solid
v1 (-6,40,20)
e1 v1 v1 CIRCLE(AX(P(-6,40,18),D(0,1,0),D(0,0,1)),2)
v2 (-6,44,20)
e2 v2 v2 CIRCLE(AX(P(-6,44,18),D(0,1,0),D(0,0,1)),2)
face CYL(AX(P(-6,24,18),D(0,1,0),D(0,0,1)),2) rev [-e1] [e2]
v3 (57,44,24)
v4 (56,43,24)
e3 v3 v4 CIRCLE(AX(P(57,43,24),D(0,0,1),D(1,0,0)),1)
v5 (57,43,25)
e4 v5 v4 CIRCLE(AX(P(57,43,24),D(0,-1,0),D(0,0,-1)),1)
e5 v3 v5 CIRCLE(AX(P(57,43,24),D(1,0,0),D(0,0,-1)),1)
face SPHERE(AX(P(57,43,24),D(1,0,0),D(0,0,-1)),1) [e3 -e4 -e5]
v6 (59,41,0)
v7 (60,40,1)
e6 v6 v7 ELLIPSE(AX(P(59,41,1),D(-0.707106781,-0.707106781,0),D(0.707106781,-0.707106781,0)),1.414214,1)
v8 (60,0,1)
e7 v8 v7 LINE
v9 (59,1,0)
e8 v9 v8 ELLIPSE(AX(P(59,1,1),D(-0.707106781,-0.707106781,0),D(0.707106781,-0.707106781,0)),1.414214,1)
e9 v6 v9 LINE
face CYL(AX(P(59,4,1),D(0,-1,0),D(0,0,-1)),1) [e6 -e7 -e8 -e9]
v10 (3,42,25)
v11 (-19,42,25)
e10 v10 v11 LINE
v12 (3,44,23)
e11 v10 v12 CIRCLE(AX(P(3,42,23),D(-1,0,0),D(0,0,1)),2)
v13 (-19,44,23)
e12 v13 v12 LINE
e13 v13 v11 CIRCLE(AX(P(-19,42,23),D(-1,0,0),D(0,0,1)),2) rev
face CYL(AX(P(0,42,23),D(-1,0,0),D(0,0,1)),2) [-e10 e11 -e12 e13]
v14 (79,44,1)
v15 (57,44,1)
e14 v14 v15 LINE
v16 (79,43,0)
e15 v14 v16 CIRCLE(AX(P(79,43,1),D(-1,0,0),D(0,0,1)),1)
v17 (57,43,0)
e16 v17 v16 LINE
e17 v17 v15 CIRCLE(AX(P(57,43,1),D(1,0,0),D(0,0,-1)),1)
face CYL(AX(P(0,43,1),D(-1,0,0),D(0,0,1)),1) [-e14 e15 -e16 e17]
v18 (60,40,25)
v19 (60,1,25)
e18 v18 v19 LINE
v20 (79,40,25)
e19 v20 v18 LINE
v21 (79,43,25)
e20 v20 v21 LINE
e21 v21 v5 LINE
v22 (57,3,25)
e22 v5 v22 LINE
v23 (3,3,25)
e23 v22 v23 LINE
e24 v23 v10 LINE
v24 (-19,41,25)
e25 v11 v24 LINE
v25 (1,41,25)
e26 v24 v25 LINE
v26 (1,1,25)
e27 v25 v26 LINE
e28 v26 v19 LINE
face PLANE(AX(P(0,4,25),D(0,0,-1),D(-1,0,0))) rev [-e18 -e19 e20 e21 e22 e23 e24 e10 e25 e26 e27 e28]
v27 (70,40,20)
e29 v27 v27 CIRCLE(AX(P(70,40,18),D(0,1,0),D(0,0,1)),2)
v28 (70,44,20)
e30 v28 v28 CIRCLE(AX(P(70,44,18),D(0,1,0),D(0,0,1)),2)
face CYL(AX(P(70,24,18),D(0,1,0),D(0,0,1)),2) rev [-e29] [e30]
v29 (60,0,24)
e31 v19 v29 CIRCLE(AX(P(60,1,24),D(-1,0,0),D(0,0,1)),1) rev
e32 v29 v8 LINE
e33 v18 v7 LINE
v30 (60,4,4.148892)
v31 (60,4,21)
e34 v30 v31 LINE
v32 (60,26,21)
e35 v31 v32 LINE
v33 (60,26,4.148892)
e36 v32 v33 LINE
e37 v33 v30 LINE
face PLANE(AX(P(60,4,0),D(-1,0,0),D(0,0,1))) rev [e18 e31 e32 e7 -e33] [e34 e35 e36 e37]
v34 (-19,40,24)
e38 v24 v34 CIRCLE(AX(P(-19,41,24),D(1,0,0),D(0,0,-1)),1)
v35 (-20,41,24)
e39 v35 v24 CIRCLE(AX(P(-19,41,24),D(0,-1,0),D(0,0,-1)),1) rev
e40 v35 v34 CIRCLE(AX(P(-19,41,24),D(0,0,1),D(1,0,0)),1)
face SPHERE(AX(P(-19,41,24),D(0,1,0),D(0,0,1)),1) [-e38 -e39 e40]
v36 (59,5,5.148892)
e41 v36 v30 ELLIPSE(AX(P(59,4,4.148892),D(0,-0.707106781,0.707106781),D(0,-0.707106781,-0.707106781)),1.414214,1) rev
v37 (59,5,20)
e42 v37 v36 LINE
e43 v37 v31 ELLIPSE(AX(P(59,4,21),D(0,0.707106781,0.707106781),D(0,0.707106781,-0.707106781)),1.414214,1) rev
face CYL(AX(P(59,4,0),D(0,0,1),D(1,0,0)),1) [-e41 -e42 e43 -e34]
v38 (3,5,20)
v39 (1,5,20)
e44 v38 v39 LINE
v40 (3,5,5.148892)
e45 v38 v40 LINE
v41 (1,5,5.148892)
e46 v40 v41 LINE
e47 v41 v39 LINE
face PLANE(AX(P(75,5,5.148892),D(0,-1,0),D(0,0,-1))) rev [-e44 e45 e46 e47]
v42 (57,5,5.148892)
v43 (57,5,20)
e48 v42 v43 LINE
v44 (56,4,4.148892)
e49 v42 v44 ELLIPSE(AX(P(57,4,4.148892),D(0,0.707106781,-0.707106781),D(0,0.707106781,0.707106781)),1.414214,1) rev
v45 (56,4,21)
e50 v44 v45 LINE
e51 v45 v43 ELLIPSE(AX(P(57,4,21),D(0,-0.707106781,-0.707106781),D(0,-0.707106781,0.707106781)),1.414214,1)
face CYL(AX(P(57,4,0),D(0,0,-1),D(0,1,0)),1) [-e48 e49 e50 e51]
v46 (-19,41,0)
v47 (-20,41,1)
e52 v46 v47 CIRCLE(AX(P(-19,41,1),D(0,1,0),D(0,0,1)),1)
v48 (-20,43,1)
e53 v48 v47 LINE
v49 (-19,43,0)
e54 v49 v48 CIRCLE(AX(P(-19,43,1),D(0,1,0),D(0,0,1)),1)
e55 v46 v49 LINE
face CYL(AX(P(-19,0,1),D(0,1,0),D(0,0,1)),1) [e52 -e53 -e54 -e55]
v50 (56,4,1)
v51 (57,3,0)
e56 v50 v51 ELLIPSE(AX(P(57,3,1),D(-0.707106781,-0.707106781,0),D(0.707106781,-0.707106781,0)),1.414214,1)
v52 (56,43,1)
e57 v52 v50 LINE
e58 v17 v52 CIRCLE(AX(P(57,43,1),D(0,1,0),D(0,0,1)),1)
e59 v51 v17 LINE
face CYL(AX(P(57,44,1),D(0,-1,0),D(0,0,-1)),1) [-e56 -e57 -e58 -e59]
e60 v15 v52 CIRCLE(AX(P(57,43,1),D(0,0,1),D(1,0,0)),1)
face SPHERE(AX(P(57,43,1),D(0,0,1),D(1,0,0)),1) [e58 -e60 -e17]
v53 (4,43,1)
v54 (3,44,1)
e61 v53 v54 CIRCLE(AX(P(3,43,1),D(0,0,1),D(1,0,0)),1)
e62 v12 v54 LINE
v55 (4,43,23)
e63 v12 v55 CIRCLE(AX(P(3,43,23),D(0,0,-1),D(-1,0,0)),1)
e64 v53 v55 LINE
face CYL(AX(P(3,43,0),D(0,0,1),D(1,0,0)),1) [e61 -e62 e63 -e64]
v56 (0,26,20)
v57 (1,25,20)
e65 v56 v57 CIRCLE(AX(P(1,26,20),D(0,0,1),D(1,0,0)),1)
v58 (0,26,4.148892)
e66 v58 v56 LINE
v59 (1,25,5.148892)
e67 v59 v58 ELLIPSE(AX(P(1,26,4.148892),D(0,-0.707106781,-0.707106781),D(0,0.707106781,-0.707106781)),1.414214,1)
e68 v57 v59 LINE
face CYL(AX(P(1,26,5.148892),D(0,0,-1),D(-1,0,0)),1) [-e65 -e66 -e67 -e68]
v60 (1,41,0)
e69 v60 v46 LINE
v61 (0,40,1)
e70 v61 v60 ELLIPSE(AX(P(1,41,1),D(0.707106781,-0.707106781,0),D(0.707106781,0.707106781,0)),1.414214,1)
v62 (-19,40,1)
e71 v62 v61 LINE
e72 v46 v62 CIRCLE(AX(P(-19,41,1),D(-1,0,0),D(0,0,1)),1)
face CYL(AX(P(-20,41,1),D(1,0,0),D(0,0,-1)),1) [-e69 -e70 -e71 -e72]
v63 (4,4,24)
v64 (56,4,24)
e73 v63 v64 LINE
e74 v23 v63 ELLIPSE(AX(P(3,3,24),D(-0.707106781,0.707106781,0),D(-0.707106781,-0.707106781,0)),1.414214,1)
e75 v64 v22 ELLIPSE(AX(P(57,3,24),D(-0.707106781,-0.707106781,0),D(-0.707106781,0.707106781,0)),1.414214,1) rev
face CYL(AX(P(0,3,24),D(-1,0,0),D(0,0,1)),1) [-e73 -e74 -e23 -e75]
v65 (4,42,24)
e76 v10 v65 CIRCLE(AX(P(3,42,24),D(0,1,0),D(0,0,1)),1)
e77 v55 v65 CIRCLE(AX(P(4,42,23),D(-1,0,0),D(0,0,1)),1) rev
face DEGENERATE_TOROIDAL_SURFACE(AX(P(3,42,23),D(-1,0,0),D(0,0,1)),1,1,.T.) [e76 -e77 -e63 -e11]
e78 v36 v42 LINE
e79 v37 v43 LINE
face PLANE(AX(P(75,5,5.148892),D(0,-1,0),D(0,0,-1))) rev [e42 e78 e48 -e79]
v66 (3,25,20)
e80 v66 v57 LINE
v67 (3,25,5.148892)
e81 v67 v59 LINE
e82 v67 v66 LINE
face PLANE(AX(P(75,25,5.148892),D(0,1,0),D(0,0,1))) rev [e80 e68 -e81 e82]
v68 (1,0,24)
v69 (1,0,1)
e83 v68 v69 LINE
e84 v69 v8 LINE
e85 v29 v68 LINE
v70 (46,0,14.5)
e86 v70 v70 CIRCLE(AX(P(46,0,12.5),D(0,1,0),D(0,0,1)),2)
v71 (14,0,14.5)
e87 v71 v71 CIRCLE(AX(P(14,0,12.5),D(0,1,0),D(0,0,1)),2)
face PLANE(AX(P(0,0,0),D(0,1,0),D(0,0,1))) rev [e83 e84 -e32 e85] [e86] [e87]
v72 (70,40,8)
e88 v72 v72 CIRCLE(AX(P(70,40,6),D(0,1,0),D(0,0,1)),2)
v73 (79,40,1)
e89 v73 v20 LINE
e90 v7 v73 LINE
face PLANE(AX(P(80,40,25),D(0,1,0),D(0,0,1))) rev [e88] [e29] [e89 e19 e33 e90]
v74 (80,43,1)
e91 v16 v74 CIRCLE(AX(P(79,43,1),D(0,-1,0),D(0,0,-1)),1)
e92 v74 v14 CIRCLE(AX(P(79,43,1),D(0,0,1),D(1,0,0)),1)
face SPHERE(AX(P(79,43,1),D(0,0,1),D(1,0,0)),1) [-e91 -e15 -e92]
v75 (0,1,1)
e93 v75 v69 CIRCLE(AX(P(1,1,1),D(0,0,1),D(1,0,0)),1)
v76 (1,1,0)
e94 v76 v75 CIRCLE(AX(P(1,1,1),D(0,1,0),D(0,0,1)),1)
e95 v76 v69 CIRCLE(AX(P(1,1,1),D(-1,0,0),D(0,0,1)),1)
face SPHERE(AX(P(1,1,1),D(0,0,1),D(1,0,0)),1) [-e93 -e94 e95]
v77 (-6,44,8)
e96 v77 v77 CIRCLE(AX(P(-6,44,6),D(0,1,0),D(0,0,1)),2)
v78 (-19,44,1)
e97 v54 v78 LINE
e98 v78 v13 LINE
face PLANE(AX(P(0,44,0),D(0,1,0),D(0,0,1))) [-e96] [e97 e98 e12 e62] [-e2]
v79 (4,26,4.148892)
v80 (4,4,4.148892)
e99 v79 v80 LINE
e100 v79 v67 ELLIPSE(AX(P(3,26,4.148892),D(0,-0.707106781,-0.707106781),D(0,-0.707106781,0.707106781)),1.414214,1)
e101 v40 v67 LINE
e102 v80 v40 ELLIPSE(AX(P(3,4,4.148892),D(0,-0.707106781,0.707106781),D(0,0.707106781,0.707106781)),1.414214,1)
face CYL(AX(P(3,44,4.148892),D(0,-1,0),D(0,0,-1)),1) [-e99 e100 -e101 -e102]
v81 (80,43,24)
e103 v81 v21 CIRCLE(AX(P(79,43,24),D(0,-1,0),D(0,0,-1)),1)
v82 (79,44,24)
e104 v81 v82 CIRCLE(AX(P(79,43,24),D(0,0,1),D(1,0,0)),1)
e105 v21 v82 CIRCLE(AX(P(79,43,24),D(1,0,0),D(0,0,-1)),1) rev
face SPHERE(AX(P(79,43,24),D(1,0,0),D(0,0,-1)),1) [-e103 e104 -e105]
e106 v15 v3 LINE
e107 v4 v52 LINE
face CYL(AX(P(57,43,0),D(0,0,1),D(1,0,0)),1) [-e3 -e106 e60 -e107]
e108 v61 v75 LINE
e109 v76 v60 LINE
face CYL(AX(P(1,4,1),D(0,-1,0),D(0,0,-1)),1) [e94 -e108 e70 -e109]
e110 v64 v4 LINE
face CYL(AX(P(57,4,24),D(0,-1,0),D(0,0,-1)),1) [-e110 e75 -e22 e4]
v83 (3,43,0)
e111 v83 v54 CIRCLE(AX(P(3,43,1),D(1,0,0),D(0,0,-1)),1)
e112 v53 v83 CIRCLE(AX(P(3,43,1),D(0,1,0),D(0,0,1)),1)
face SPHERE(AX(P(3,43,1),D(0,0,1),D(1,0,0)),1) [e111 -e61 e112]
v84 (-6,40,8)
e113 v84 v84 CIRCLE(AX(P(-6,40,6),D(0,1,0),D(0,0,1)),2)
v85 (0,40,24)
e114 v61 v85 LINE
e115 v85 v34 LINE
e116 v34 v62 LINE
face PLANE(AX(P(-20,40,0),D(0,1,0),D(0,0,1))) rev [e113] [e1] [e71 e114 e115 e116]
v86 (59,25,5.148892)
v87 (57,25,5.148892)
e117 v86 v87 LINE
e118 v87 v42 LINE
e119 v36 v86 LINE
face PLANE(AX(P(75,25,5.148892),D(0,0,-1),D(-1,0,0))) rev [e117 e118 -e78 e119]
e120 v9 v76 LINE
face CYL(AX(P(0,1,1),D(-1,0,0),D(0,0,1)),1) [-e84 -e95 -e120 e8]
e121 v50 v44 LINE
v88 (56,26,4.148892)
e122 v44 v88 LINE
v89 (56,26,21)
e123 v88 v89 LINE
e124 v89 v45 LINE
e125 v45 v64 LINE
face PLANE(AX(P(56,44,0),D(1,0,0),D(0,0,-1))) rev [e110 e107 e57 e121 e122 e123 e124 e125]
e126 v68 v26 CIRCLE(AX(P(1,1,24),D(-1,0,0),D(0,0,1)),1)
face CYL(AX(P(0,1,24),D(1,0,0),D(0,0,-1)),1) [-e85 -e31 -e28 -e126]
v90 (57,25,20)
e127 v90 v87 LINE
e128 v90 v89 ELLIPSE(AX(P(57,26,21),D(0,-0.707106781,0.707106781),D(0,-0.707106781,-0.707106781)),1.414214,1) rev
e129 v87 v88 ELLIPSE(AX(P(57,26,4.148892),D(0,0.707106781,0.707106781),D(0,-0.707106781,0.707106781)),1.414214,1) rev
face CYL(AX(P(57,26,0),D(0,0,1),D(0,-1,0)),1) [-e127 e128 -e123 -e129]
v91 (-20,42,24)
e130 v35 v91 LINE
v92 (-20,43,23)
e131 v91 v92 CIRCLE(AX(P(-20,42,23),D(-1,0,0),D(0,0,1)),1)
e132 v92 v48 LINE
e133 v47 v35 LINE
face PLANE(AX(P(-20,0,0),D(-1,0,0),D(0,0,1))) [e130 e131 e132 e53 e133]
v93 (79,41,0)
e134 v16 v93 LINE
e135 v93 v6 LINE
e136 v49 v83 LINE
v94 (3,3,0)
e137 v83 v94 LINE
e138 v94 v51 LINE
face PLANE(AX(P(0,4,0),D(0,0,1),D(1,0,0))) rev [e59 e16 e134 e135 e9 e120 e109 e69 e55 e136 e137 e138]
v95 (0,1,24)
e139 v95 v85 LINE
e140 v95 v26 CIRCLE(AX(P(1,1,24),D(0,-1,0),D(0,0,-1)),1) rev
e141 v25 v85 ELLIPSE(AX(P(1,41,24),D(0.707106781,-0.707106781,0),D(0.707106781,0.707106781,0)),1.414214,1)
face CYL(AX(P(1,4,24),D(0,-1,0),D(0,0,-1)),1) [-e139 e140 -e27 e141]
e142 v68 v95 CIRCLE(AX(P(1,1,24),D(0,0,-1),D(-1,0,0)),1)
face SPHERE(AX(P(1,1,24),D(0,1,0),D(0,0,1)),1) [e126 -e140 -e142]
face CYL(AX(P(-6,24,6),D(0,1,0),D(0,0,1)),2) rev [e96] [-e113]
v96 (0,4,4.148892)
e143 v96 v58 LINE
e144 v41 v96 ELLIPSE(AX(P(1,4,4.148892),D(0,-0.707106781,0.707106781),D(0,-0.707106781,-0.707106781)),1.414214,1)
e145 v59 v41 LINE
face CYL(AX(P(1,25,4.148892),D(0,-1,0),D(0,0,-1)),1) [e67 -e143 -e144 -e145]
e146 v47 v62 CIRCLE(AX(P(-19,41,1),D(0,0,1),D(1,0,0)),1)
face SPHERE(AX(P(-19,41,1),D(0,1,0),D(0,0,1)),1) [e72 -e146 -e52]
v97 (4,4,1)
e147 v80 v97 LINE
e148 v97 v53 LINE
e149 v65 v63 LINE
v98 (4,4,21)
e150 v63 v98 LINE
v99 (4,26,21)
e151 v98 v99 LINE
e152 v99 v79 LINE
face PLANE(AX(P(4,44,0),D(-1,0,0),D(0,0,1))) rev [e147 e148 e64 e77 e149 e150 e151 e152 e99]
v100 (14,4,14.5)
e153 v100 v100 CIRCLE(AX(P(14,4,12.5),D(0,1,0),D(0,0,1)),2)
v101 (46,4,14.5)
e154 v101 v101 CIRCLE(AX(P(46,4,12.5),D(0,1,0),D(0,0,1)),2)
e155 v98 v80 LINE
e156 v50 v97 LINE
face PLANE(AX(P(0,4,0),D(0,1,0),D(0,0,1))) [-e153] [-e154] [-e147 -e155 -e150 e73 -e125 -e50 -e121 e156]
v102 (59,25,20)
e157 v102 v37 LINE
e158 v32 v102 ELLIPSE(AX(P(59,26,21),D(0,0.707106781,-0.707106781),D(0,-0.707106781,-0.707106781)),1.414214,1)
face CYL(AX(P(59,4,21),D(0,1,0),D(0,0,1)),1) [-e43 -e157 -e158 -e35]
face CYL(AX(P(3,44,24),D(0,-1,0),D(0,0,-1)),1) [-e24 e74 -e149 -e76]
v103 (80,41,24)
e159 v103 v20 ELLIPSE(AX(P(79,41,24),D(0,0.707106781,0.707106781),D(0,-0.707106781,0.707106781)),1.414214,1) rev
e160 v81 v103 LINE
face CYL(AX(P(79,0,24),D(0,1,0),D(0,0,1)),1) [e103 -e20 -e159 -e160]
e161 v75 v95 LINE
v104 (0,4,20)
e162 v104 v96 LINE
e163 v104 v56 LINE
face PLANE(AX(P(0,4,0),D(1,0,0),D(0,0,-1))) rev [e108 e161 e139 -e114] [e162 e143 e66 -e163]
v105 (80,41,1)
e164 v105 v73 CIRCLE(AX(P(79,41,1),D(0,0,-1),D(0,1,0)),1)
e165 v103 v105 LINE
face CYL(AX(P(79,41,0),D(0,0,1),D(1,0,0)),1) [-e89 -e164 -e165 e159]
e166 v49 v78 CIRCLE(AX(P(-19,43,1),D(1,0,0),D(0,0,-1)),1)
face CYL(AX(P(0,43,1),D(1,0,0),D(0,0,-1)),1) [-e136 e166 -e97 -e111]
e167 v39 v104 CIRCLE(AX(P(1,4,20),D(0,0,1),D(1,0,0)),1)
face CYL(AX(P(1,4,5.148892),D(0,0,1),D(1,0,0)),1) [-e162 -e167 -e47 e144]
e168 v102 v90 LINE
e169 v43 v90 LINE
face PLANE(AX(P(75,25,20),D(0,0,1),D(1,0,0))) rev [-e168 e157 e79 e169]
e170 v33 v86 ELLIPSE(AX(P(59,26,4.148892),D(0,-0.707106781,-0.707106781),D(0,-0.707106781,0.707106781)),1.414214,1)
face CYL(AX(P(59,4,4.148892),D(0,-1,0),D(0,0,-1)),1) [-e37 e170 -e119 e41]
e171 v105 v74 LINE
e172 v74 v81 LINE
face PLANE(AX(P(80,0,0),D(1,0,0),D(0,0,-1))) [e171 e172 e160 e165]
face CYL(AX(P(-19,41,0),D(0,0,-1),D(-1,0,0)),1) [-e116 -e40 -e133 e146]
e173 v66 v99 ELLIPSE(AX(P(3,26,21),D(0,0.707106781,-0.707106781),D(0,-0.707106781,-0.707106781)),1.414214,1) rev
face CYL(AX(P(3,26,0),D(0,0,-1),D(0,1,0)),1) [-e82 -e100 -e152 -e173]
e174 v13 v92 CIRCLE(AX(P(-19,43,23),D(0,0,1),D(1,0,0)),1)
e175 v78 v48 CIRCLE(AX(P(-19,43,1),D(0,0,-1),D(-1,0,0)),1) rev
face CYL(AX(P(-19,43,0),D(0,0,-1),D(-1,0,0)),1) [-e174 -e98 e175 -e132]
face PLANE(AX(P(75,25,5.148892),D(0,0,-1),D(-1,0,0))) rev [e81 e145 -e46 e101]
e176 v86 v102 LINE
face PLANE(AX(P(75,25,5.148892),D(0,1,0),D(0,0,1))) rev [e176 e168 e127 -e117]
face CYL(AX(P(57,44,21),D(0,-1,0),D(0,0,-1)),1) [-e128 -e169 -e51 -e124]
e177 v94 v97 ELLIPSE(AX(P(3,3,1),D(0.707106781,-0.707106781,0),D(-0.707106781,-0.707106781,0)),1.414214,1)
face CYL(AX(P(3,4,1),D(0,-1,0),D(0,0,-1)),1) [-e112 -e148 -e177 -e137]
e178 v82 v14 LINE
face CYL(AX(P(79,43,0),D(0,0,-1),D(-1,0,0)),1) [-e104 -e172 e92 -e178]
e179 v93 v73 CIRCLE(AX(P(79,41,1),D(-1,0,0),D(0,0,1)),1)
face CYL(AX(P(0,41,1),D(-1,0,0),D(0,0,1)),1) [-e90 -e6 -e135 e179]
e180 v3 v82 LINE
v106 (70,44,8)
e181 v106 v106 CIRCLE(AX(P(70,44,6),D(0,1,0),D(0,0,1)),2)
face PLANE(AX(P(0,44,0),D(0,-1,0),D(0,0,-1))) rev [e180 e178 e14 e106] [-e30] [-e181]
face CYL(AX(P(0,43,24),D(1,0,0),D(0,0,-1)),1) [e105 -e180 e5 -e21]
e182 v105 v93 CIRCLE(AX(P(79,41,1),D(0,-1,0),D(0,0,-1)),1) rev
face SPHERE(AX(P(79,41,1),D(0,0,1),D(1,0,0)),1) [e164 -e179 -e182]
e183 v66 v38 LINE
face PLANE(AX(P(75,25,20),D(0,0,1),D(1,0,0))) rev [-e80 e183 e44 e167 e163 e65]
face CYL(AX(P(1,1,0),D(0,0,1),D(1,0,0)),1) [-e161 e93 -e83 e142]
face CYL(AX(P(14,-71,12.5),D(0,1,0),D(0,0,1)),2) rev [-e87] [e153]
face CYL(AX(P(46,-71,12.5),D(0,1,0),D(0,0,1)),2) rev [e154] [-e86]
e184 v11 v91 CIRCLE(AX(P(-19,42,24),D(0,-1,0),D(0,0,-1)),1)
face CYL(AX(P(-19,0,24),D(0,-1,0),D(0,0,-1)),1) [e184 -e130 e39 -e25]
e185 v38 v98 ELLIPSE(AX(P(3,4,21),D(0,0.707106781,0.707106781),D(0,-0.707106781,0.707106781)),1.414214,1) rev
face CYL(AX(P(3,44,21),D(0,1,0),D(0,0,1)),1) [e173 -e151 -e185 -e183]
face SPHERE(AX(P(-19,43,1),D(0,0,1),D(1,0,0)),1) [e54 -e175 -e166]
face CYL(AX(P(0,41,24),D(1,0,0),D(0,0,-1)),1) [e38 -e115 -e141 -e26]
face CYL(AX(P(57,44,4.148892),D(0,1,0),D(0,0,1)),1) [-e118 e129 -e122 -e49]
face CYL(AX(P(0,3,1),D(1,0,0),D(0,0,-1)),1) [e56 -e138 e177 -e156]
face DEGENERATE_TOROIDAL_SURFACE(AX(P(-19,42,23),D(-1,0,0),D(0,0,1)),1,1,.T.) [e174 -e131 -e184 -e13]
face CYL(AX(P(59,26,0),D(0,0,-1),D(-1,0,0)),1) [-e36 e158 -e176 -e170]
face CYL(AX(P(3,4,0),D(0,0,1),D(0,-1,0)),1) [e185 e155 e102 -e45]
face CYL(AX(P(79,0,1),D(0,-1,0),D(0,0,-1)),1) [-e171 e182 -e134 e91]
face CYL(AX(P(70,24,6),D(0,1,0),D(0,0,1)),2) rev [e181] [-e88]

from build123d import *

# Parameters (mm, degrees)
BOSS_EXTRUDE1_DEPTH = 4
BOSS_EXTRUDE2_DEPTH = 40
SKETCH3_W           = 25
SKETCH3_H           = 4.000000000000007
BOSS_EXTRUDE3_DEPTH = 20
BOSS_EXTRUDE4_DEPTH = 20
SKETCH5_R           = 2.0000000000000004
SKETCH5_R_2         = 2.0000000000000018
SKETCH5_R_3         = 1.9999999999999967
CUT_EXTRUDE1_DEPTH  = 20
CUT_EXTRUDE3_DEPTH  = 75.00000000000004
SKETCH11_R          = 2.0000000000000027
CUT_EXTRUDE4_DEPTH  = 75.00000000000004
FILLET1_R           = 2
FILLET2_R           = 1
FILLET3_R           = 1
FILLET4_R           = 1
FILLET5_R           = 1
FILLET6_R           = 1
FILLET7_R           = 1
FILLET8_R           = 1
FILLET9_R           = 1
FILLET10_R          = 1
FILLET11_R          = 1
FILLET12_R          = 1
FILLET13_R          = 1
FILLET14_R          = 1
FILLET15_R          = 1
FILLET16_R          = 1
FILLET17_R          = 1
FILLET18_R          = 1
FILLET19_R          = 1
FILLET20_R          = 1
FILLET21_R          = 1


# Some blends are built 0.0001 mm under size
with BuildPart() as part:
    # Sketch1 → Boss-Extrude1 (new body)
    with BuildSketch(Plane(origin=(0, 0, 0), x_dir=(1, 0, 0), z_dir=(0, 1, 0))):
        Polygon((0, 0), (60, 0), (60.00000000000001, -25), (6.94e-15, -25), align=None)
    extrude(amount=BOSS_EXTRUDE1_DEPTH)

    # Sketch2 → Boss-Extrude2 (add)
    with BuildSketch(Plane(origin=(0, 4, 0), x_dir=(1, 0, 0), z_dir=(0, 1, 0))):
        Polygon((0, 0), (4, 0), (4.0000000000000036, -25), (0, -25), align=None)
        Polygon((60, 0), (55.99999999999999, -4.9e-16), (55.99999999999999, -25), (60, -25), align=None)
    extrude(amount=BOSS_EXTRUDE2_DEPTH)

    # Sketch3 → Boss-Extrude3 (add)
    with BuildSketch(Plane(origin=(60, 0, -1.665e-14), x_dir=(-2.8e-16, 0, -1), z_dir=(1, 0, -2.8e-16))):
        with Locations((-12.500000000000018, 42)):
            Rectangle(SKETCH3_W, SKETCH3_H)
    extrude(amount=BOSS_EXTRUDE3_DEPTH)

    # Sketch4 → Boss-Extrude4 (add)
    with BuildSketch(Plane.ZY):
        Polygon((0, 44), (25, 44), (25, 39.99999999999999), (4.9e-16, 39.99999999999999), align=None)
    extrude(amount=BOSS_EXTRUDE4_DEPTH)

    # Sketch5 → Cut-Extrude1 (cut)
    with BuildSketch(Plane(origin=(0, 44, 0), x_dir=(1, 0, 0), z_dir=(0, 1, 0))):
        with Locations(Location((-5.999999999999995, -6.000000000000008, 0), (0, 0, 270))):
            Circle(SKETCH5_R)
        with Locations(Location((-5.9999999999999964, -18.00000000000001, 0), (0, 0, 270))):
            Circle(SKETCH5_R_2)
        with Locations(Location((69.99999999999999, -6.000000000000002, 0), (0, 0, 270))):
            Circle(SKETCH5_R_3)
        with Locations(Location((70, -18.000000000000004, 0), (0, 0, 270))):
            Circle(SKETCH5_R_3)
    extrude(amount=-CUT_EXTRUDE1_DEPTH, mode=Mode.SUBTRACT)

    # Sketch10 → Cut-Extrude3 (cut)
    with BuildSketch(Plane.ZY):
        Polygon((5.148891761902153, 25), (20, 25.000000000000004), (20.000000000000004, 5.0000000000000036), (5.148891761902154, 5.000000000000001), align=None)
    extrude(amount=-CUT_EXTRUDE3_DEPTH, mode=Mode.SUBTRACT)

    # Sketch11 → Cut-Extrude4 (cut)
    with BuildSketch(Plane(origin=(0, 4, 0), x_dir=(1, 0, 0), z_dir=(0, 1, 0))):
        with Locations(Location((14.000000000000005, -12.5, 0), (0, 0, 270))):
            Circle(SKETCH11_R)
        with Locations(Location((45.99999999999999, -12.5, 0), (0, 0, 270))):
            Circle(SKETCH11_R)
    extrude(amount=-CUT_EXTRUDE4_DEPTH, mode=Mode.SUBTRACT)

    # Fillet1
    fillet1_edges = [part.edges().sort_by_distance(p)[0] for p in [
        (-7.999999999999995, 44, 25.000000000000004),
    ]]
    fillet(fillet1_edges, radius=FILLET1_R)

    # Fillet2
    fillet2_edges = [part.edges().sort_by_distance(p)[0] for p in [
        (-19.999999999999996, 44, 11.500000000000002),
        (4.000000000000002, 44, 11.499999999999996),
        (4.0000000000000036, 23, 25),
        (4.0000000000000036, 43.41421356237309, 24.41421356237309),
        (-19.999999999999993, 43.41421356237309, 24.414213562373096),
        (-19.999999999999993, 41, 25.000000000000007),
    ]]
    fillet(fillet2_edges, radius=FILLET2_R)

    # Fillet3
    fillet3_edges = [part.edges().sort_by_distance(p)[0] for p in [
        (68, 44, 25),
    ]]
    fillet(fillet3_edges, radius=FILLET3_R)

    # Fillet4
    fillet4_edges = [part.edges().sort_by_distance(p)[0] for p in [
        (55.99999999999999, 23.5, 25),
        (55.99999999999999, 43.707106781186546, 24.707106781186546),
        (55.99999999999999, 44, 12),
    ]]
    fillet(fillet4_edges, radius=FILLET4_R)

    # Fillet5
    fillet5_edges = [part.edges().sort_by_distance(p)[0] for p in [
        (30, 4, 25),
    ]]
    fillet(fillet5_edges, radius=FILLET5_R)

    # Fillet6
    fillet6_edges = [part.edges().sort_by_distance(p)[0] for p in [
        (3.49e-15, 5.000000000000002, 12.574445880951078),
    ]]
    fillet(fillet6_edges, radius=FILLET6_R)

    # Fillet7
    fillet7_edges = [part.edges().sort_by_distance(p)[0] for p in [
        (1.32e-15, 14.5, 5.148891761902153),
    ]]
    fillet(fillet7_edges, radius=FILLET7_R)

    # Fillet8
    fillet8_edges = [part.edges().sort_by_distance(p)[0] for p in [
        (3.33e-15, 25, 12.074445880951076),
    ]]
    fillet(fillet8_edges, radius=FILLET8_R)

    # Fillet9
    fillet9_edges = [part.edges().sort_by_distance(p)[0] for p in [
        (3.78e-15, 19.999999999999996, 25),
    ]]
    fillet(fillet9_edges, radius=FILLET9_R)

    # Fillet10
    fillet10_edges = [part.edges().sort_by_distance(p)[0] for p in [
        (55.99999999999999, 5.000000000000003, 12.574445880951062),
    ]]
    fillet(fillet10_edges, radius=FILLET10_R - 0.0001)  # a hair under: the kernel refuses the full size

    # Fillet11
    fillet11_edges = [part.edges().sort_by_distance(p)[0] for p in [
        (55.99999999999999, 14.500050000000002, 5.148891761902138),
    ]]
    fillet(fillet11_edges, radius=FILLET11_R)

    # Fillet12
    fillet12_edges = [part.edges().sort_by_distance(p)[0] for p in [
        (55.99999999999999, 25, 12.074445880951062),
    ]]
    fillet(fillet12_edges, radius=FILLET12_R)

    # Fillet13
    fillet13_edges = [part.edges().sort_by_distance(p)[0] for p in [
        (55.99999999999999, 15.000050000000003, 19.999999999999986),
    ]]
    fillet(fillet13_edges, radius=FILLET13_R)

    # Fillet14
    fillet14_edges = [part.edges().sort_by_distance(p)[0] for p in [
        (30.500000000000007, 0, 25),
        (0.2928932188134594, -1.1e-16, 24.707106781186546),
        (3.33e-15, 0, 12),
    ]]
    fillet(fillet14_edges, radius=FILLET14_R)

    # Fillet15
    fillet15_edges = [part.edges().sort_by_distance(p)[0] for p in [
        (29.999999999999996, 4, 0),
    ]]
    fillet(fillet15_edges, radius=FILLET15_R)

    # Fillet16
    fillet16_edges = [part.edges().sort_by_distance(p)[0] for p in [
        (0, 20.499999999999996, 0),
        (0.2928932188134523, 0.2928932188134522, 2e-16),
        (56.29289321881345, 43.707106781186546, 0),
        (30.5, 0, 0),
        (60, 19.999999999999996, 0),
        (80, 42, -5.55e-15),
        (70, 39.99999999999999, -2.78e-15),
        (68.5, 44, -2.66e-15),
        (55.99999999999999, 23, -1.1e-16),
    ]]
    fillet(fillet16_edges, radius=FILLET16_R)

    # Fillet17
    fillet17_edges = [part.edges().sort_by_distance(p)[0] for p in [
        (3.7071067811865475, 43.707106781186546, -1e-16),
        (-20, 41.5, 5.86e-15),
        (-19.707106781186546, 43.707106781186546, 2e-16),
        (4, 23, -1.1e-16),
        (-8, 44, 2.78e-15),
    ]]
    fillet(fillet17_edges, radius=FILLET17_R)

    # Fillet18
    fillet18_edges = [part.edges().sort_by_distance(p)[0] for p in [
        (-8.999999999999996, 39.99999999999999, 25),
        (-19.70710678118654, 39.99999999999999, 24.707106781186546),
        (-19.999999999999996, 39.99999999999999, 12.499999999999998),
        (-19.707106781186546, 39.99999999999999, 0.29289321881345254),
        (-9, 39.99999999999999, 2.99e-15),
    ]]
    fillet(fillet18_edges, radius=FILLET18_R)

    # Fillet19
    # the kernel refuses this fillet: 1 mm, written as the material it takes off along each edge
    with BuildSketch(Plane(origin=(79, 43, 1), x_dir=(1, 0, -2.8e-16), z_dir=(0, 1, 0))) as fillet19_piece_1_section:
        Polygon((0, 0), (FILLET19_R * 1.02, 0), (FILLET19_R * 1.02, FILLET19_R * 1.02), (2.8e-16, FILLET19_R * 1.02), align=None)
    fillet19_piece_1 = extrude(amount=FILLET19_R * 1.02, mode=Mode.PRIVATE)
    fillet19_piece_1 = fillet19_piece_1 - Plane(origin=(79, 43, 1), x_dir=(-0.7071067811865475, 0, 0.7071067811865477), z_dir=(0, 1, 0)) * Sphere(FILLET19_R, mode=Mode.PRIVATE)
    add(fillet19_piece_1, mode=Mode.SUBTRACT)
    with BuildSketch(Plane(origin=(79, 40.99999999999999, 1.0000000000000002), x_dir=(0, -1, 0), z_dir=(1, 0, -2.8e-16))) as fillet19_piece_2_section:
        Polygon((0, 0), (FILLET19_R * 1.02, 0), (FILLET19_R * 1.02, FILLET19_R * 1.02), (0, FILLET19_R * 1.02), align=None)
    fillet19_piece_2 = extrude(amount=FILLET19_R * 1.02, mode=Mode.PRIVATE)
    fillet19_piece_2 = fillet19_piece_2 - Plane(origin=(79, 40.99999999999999, 1.0000000000000002), x_dir=(0, 0.7071067811865475, 0.7071067811865475), z_dir=(1, 0, -2.8e-16)) * Sphere(FILLET19_R, mode=Mode.PRIVATE)
    add(fillet19_piece_2, mode=Mode.SUBTRACT)
    with BuildSketch(Plane(origin=(80, 37.49999999999999, 25), x_dir=(-1, 0, 0), z_dir=(0, 1, 0))) as fillet19_piece_3:
        with BuildLine():
            CenterArc((FILLET19_R, -FILLET19_R), FILLET19_R, 90, 90)
            Line((0, -FILLET19_R), (0, 0))
            Line((0, 0), (FILLET19_R, 0))
        make_face()
    extrude(amount=5.500000000000007, mode=Mode.SUBTRACT)
    with BuildSketch(Plane(origin=(80, 43, 23.999999999999996), x_dir=(0, 0, 1), z_dir=(0, -1, 0))) as fillet19_piece_4:
        with BuildLine():
            CenterArc((1 - FILLET19_R, FILLET19_R), FILLET19_R, 270, 90)
            Line((1 - FILLET19_R, 0), (1, 0))
            Line((1, 0), (1, FILLET19_R))
        make_face()
    revolve(axis=Axis((80, 43, 23.999999999999996), (-1, 0, 1.5e-16)), revolution_arc=90, mode=Mode.SUBTRACT)
    with BuildSketch(Plane(origin=(80, 44, 23.999999999999996), x_dir=(-1, 0, 2.8e-16), z_dir=(-2.8e-16, 0, -1))) as fillet19_piece_5:
        with BuildLine():
            CenterArc((FILLET19_R, -FILLET19_R), FILLET19_R, 90, 90)
            Line((0, -FILLET19_R), (0, 0))
            Line((0, 0), (FILLET19_R, 0))
        make_face()
    extrude(amount=22.999999999999996, mode=Mode.SUBTRACT)
    with BuildSketch(Plane(origin=(80, 39.99999999999999, 0.9999999999999998), x_dir=(0, 1, 0), z_dir=(2.8e-16, 0, 1))) as fillet19_piece_6:
        with BuildLine():
            CenterArc((FILLET19_R, FILLET19_R), FILLET19_R, 180, 90)
            Line((0, FILLET19_R), (0, 0))
            Line((0, 0), (FILLET19_R, 0))
        make_face()
    extrude(amount=26.499999999999996, mode=Mode.SUBTRACT)

    # Fillet20
    fillet20_edges = [part.edges().sort_by_distance(p)[0] for p in [
        (60, 15, 5.148891761902136),
        (60, 25.000000000000004, 12.57444588095106),
        (60.00000000000001, 15.000000000000004, 19.999999999999986),
        (60, 5.000000000000003, 12.574445880951062),
    ]]
    fillet(fillet20_edges, radius=FILLET20_R)

    # Fillet21
    fillet21_edges = [part.edges().sort_by_distance(p)[0] for p in [
        (4.000000000000001, 15, 5.148891761902152),
        (4.000000000000002, 25.000000000000004, 12.574445880951075),
        (4.000000000000003, 15.000000000000004, 20),
        (4.000000000000002, 5.000000000000003, 12.574445880951076),
    ]]
    fillet(fillet21_edges, radius=FILLET21_R - 0.0001)  # a hair under: the kernel refuses the full size


solid = part.part
